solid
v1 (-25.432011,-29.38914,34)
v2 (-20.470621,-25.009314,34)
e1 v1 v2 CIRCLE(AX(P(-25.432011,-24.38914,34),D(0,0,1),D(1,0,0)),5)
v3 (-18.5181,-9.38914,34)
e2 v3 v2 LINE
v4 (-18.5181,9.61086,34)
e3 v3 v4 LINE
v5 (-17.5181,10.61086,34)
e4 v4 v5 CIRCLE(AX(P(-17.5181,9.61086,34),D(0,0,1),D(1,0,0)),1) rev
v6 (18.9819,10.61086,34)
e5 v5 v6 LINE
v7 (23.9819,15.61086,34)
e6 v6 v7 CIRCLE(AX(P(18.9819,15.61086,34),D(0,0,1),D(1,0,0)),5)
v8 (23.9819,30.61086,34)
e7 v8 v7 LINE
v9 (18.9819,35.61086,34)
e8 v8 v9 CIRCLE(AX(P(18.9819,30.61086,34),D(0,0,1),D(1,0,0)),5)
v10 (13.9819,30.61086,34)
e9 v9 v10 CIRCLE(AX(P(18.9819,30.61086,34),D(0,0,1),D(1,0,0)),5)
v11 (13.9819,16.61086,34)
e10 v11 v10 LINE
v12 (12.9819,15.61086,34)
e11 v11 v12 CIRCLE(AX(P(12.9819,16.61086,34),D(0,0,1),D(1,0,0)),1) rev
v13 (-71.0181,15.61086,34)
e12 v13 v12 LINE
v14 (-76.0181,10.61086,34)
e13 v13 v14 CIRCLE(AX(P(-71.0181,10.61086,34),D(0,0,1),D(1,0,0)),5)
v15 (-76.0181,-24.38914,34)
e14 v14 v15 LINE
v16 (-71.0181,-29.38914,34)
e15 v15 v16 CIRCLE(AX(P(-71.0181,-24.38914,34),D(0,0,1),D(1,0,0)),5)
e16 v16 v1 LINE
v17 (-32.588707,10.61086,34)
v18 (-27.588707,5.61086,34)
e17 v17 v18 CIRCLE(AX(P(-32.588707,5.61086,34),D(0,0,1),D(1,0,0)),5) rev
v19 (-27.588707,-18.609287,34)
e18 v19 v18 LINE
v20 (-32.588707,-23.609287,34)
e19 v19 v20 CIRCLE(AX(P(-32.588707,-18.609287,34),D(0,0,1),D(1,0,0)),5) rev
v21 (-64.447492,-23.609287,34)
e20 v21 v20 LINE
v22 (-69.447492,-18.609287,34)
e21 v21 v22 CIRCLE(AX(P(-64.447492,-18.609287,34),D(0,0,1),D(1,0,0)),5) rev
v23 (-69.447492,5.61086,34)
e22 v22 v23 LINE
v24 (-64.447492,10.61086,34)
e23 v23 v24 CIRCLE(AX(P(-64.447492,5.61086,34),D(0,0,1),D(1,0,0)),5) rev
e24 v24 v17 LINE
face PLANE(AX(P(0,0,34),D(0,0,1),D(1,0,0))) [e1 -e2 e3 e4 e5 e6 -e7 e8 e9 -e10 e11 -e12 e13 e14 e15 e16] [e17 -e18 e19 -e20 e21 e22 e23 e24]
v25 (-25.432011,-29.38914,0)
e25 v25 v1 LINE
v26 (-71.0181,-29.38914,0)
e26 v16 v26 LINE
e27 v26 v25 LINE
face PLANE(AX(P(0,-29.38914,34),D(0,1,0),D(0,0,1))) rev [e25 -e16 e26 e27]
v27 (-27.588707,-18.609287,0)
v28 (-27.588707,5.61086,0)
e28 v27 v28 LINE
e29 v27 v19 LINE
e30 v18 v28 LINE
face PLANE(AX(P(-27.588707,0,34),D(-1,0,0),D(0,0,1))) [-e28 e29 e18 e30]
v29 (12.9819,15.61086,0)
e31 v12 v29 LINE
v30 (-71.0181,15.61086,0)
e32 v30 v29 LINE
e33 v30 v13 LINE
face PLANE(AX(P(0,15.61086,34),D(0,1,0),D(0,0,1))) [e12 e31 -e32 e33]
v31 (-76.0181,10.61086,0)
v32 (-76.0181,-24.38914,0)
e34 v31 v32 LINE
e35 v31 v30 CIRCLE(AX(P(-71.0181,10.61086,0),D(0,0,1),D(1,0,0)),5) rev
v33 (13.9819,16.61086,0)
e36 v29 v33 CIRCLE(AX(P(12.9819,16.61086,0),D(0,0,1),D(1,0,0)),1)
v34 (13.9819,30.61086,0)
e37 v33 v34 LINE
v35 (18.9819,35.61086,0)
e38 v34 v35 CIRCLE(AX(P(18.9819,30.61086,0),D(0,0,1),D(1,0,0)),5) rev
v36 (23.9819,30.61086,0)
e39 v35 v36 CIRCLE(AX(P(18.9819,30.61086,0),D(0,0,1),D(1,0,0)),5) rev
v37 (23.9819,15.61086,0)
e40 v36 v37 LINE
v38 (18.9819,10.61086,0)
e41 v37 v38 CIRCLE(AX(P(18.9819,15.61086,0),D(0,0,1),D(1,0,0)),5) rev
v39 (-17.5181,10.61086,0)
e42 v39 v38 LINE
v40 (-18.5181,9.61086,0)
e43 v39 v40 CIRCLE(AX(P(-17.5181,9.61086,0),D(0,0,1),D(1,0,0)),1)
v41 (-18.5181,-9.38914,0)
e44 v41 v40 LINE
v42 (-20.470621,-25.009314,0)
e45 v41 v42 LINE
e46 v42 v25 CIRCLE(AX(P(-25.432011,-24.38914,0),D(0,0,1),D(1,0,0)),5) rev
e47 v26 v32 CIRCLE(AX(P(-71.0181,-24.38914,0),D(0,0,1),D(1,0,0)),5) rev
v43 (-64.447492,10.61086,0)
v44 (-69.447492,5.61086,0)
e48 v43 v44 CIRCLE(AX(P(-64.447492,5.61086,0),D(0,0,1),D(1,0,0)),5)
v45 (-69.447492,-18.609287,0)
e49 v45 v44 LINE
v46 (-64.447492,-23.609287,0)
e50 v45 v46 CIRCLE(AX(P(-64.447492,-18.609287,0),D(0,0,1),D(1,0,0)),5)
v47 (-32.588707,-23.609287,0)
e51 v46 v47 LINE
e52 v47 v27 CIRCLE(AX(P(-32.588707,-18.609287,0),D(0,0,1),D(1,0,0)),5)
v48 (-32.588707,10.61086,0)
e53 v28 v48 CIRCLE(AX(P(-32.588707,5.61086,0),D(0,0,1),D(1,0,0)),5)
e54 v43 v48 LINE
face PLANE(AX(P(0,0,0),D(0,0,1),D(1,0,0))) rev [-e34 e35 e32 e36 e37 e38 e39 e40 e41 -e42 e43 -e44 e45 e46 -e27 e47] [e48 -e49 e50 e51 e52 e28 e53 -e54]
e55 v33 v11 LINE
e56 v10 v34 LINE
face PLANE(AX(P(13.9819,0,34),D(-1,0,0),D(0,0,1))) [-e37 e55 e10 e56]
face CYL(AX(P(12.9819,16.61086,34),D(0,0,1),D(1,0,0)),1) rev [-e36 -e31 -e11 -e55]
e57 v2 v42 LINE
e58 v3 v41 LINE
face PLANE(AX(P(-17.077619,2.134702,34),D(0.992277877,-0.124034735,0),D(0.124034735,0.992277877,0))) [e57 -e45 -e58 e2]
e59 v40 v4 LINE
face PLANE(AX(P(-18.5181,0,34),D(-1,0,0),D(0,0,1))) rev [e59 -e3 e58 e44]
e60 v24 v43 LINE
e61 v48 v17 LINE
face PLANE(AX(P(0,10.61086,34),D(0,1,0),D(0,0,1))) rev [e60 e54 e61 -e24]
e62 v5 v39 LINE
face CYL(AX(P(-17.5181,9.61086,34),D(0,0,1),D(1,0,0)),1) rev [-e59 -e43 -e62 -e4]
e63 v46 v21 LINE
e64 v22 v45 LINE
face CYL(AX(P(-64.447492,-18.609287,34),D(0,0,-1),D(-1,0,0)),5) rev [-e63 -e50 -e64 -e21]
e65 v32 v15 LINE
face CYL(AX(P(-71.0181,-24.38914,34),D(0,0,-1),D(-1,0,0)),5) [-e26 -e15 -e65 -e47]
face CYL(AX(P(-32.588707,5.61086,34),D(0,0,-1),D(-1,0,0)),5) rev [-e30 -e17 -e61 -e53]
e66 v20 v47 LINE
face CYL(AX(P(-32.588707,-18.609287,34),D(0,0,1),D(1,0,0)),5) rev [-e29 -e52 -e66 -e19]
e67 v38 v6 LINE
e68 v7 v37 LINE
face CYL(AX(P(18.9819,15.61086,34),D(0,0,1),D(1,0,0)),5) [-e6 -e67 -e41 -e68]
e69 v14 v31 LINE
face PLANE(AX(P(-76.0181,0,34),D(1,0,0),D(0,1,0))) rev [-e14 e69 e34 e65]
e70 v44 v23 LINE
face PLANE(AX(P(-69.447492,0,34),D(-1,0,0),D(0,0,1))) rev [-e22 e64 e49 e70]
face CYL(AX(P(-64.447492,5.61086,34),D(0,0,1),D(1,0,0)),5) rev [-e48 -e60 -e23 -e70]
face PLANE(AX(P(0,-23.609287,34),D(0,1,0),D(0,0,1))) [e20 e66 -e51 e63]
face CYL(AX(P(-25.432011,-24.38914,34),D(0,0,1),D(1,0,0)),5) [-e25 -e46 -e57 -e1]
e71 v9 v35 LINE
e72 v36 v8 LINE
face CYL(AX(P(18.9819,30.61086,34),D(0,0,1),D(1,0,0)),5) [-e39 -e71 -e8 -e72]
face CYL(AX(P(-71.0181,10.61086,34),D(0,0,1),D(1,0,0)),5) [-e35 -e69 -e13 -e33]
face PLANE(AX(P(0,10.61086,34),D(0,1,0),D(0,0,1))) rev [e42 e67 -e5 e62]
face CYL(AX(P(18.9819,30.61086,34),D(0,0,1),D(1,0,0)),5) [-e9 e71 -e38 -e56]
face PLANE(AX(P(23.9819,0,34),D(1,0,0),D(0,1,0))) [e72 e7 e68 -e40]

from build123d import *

# Parameters (mm, degrees)
SKETCH1_W           = 41.858784395
SKETCH1_H           = 34.22014658
BOSS_EXTRUDE1_DEPTH = 34
FILLET1_R           = 1
FILLET2_R           = 5
FILLET3_R           = 5


with BuildPart() as part:
    # Sketch1 → Boss-Extrude1 (new body)
    with BuildSketch(Plane.XY):
        Polygon((23.981900452, 10.610859729), (-16.018099548, 10.610859729), (-18.518099548, 10.610859729), (-18.518099548, -9.389140271), (-21.018099548, -29.389140271), (-76.018099548, -29.389140271), (-76.018099548, 10.610859729), (-76.018099548, 15.610859729), (13.981900452, 15.610859729), (13.981900452, 35.610859729), (23.981900452, 35.610859729), (23.981900452, 15.610859729), align=None)
        with Locations((-48.518099548, -6.499213561)):
            Rectangle(SKETCH1_W, SKETCH1_H, mode=Mode.SUBTRACT)
    extrude(amount=BOSS_EXTRUDE1_DEPTH)

    # Fillet1
    fillet1_edges = [part.edges().sort_by_distance(p)[0] for p in [
        (-18.518099548, 10.610859729, 17),
        (13.981900452, 15.610859729, 17),
    ]]
    fillet(fillet1_edges, radius=FILLET1_R)

    # Fillet2
    fillet2_edges = [part.edges().sort_by_distance(p)[0] for p in [
        (-27.58870735, 10.610859729, 17),
        (-69.447491745, 10.610859729, 17),
        (-69.447491745, -23.609286851, 17),
        (-27.58870735, -23.609286851, 17),
    ]]
    fillet(fillet2_edges, radius=FILLET2_R)

    # Fillet3
    fillet3_edges = [part.edges().sort_by_distance(p)[0] for p in [
        (13.981900452, 35.610859729, 17),
        (23.981900452, 35.610859729, 17),
        (23.981900452, 10.610859729, 17),
        (-76.018099548, 15.610859729, 17),
        (-76.018099548, -29.389140271, 17),
        (-21.018099548, -29.389140271, 17),
    ]]
    fillet(fillet3_edges, radius=FILLET3_R - 0.0001)  # a hair under: the kernel refuses the full size


solid = part.part
